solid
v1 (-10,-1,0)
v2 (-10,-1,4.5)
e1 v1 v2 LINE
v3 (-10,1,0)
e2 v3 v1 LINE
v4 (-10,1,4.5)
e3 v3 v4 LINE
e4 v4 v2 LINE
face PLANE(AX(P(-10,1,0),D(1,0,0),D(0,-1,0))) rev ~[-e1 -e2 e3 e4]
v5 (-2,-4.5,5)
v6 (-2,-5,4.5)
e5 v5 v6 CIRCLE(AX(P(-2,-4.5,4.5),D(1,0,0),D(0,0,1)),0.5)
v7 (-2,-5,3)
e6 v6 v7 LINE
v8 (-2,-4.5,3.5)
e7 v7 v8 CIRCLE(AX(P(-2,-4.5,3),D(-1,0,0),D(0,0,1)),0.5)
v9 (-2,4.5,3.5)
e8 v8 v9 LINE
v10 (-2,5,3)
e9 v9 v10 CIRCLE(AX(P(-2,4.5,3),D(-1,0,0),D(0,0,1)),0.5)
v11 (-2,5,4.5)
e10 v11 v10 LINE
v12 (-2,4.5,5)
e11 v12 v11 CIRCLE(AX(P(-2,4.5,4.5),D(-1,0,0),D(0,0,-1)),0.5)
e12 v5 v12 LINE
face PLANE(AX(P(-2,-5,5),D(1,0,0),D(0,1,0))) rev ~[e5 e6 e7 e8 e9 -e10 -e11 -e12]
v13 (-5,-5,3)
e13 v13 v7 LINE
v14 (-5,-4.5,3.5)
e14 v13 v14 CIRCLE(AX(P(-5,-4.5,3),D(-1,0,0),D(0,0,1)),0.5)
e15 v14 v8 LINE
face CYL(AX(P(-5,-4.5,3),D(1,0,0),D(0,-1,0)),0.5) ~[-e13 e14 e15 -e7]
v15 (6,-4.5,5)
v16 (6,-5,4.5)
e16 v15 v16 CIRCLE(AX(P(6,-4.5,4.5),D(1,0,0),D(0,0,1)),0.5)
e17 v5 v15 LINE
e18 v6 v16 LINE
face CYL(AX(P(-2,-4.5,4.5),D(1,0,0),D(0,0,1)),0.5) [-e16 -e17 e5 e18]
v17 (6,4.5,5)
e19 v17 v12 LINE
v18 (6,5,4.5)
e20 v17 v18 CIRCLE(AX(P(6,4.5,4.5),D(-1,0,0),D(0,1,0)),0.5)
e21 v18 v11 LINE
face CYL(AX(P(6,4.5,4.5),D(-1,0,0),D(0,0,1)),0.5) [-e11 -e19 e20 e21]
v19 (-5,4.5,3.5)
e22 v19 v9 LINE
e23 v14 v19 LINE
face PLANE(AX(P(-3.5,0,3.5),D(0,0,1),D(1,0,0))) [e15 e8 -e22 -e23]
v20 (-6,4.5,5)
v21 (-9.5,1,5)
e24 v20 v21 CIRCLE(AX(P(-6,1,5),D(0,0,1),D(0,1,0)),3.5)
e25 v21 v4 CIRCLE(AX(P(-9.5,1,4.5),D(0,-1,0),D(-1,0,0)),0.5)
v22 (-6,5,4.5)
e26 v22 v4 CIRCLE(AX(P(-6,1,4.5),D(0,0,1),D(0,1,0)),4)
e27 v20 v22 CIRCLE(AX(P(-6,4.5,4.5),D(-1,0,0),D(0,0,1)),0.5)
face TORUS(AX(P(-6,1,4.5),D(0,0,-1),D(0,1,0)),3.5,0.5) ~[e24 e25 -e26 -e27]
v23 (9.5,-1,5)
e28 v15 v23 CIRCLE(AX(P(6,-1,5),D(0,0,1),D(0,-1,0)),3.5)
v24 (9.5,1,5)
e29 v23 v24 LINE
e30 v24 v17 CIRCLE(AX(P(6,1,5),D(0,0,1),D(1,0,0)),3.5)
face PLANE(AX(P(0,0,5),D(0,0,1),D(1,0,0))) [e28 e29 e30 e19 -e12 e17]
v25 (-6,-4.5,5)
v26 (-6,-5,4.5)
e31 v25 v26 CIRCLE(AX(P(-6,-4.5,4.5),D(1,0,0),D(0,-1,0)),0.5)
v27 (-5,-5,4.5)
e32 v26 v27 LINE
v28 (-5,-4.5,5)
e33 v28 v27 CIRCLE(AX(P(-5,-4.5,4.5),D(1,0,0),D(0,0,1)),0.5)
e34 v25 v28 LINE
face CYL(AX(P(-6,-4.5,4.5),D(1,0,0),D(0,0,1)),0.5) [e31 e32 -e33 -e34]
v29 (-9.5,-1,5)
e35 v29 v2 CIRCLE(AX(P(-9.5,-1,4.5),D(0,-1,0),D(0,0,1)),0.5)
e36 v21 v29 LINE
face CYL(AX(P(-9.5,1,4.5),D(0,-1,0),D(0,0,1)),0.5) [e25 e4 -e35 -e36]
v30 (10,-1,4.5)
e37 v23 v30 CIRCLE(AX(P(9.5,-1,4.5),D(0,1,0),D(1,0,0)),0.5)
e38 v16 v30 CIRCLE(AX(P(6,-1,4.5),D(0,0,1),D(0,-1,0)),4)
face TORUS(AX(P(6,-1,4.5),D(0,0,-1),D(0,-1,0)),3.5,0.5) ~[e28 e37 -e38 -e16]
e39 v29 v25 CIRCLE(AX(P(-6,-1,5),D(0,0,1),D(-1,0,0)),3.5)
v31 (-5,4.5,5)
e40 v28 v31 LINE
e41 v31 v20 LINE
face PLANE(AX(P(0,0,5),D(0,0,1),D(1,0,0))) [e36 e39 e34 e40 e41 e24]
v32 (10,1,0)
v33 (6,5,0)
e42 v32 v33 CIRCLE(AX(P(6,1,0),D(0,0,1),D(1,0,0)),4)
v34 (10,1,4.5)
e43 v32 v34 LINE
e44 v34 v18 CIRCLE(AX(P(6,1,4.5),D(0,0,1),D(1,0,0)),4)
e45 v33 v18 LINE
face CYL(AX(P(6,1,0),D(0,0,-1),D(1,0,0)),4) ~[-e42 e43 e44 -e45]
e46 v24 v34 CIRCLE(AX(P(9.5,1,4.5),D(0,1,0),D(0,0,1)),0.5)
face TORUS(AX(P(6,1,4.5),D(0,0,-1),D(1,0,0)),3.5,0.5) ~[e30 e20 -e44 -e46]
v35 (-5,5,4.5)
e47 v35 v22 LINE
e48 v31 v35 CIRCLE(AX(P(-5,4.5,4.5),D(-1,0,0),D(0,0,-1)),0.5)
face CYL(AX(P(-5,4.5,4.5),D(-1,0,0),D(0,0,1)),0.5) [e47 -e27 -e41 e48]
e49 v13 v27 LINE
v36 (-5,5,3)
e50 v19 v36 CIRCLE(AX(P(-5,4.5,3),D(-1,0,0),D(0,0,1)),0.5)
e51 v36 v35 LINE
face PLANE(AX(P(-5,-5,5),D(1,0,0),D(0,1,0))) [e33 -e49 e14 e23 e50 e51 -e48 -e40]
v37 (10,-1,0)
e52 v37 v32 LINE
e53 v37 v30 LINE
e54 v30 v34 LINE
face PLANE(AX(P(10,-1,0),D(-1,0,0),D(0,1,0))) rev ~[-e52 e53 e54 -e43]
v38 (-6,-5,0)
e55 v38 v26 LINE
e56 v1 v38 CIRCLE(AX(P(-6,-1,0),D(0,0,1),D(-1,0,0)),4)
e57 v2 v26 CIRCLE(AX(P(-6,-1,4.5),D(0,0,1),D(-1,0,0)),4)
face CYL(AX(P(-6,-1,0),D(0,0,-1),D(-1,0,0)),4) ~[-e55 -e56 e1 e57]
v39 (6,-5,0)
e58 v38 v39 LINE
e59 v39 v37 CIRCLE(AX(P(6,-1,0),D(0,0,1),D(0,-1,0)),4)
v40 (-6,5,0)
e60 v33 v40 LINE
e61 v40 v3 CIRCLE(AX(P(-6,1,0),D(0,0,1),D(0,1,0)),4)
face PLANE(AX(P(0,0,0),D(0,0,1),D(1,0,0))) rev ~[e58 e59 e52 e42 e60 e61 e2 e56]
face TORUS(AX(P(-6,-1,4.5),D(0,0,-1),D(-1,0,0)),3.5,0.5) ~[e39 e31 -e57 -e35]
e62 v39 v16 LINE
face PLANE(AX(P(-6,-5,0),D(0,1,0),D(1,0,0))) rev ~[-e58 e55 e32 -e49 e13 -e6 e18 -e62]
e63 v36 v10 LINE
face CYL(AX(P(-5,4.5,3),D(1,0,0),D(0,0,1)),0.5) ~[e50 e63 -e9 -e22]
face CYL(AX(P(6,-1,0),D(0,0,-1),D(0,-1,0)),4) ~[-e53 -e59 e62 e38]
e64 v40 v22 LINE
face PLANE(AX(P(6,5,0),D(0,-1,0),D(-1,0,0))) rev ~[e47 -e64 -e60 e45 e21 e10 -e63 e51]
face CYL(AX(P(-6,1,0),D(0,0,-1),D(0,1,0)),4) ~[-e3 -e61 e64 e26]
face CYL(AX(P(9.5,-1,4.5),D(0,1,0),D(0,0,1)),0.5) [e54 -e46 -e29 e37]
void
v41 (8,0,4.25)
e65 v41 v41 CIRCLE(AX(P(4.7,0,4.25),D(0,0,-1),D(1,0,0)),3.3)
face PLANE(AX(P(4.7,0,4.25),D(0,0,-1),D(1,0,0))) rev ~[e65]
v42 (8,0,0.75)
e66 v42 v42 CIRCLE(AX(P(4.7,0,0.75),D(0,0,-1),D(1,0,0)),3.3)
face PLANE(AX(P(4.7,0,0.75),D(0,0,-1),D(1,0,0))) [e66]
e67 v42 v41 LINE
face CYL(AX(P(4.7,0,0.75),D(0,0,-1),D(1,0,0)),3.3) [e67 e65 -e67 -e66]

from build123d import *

# Parameters (mm, degrees)
F1_DEPTH = 5
F2_W     = 3
F2_H     = 10
F3_DEPTH = 1.5
F4_R     = 0.5
F6_START = -0.75
F5_R     = 3.3
F6_DEPTH = 3.5


# Not quite as in the source:
# - a feature names something its author has since deleted; it is built from what else it names


with BuildPart() as f1:
    # F0 (on Top) → F1 (new body)
    with BuildSketch(Plane.XY):
        with BuildLine():
            Line((-6, -5), (6, -5))
            ThreePointArc((6, -5), (8.8284271247, -3.8284271247), (10, -1))
            Line((10, -1), (10, 1))
            ThreePointArc((10, 1), (8.8284271247, 3.8284271247), (6, 5))
            Line((6, 5), (-6, 5))
            ThreePointArc((-6, 5), (-8.8284271247, 3.8284271247), (-10, 1))
            Line((-10, 1), (-10, -1))
            ThreePointArc((-10, -1), (-8.8284271247, -3.8284271247), (-6, -5))
        make_face()
    extrude(amount=F1_DEPTH)

    # F2 (on face) → F3 (cut)
    with BuildSketch(Plane.XY.offset(5)):
        with Locations((-3.5, 0)):
            Rectangle(F2_W, F2_H)
    extrude(amount=-F3_DEPTH, mode=Mode.SUBTRACT)

    # F4
    f4_edges = [f1.edges().sort_by_distance(p)[0] for p in [
        (-3.5, -5, 3.5),
        (-3.5, 5, 3.5),
        (2, 5, 5),
        (2, -5, 5),
        (-10, 0, 5),
        (-8.828427, 3.828427, 5),
        (-8.828427, -3.828427, 5),
        (-5.5, 5, 5),
        (-5.5, -5, 5),
        (8.828427, -3.828427, 5),
        (10, 0, 5),
        (8.828427, 3.828427, 5),
    ]]
    fillet(f4_edges, radius=F4_R)

    # F5 (on face) → F6 (cut)
    with BuildSketch(Plane(origin=(0, 0, 0), x_dir=(1, 0, 0), z_dir=(0, 0, -1)).offset(F6_START)):
        with Locations((4.7, 0)):
            Circle(F5_R)
    extrude(amount=-F6_DEPTH, mode=Mode.SUBTRACT)


solid = f1.part
